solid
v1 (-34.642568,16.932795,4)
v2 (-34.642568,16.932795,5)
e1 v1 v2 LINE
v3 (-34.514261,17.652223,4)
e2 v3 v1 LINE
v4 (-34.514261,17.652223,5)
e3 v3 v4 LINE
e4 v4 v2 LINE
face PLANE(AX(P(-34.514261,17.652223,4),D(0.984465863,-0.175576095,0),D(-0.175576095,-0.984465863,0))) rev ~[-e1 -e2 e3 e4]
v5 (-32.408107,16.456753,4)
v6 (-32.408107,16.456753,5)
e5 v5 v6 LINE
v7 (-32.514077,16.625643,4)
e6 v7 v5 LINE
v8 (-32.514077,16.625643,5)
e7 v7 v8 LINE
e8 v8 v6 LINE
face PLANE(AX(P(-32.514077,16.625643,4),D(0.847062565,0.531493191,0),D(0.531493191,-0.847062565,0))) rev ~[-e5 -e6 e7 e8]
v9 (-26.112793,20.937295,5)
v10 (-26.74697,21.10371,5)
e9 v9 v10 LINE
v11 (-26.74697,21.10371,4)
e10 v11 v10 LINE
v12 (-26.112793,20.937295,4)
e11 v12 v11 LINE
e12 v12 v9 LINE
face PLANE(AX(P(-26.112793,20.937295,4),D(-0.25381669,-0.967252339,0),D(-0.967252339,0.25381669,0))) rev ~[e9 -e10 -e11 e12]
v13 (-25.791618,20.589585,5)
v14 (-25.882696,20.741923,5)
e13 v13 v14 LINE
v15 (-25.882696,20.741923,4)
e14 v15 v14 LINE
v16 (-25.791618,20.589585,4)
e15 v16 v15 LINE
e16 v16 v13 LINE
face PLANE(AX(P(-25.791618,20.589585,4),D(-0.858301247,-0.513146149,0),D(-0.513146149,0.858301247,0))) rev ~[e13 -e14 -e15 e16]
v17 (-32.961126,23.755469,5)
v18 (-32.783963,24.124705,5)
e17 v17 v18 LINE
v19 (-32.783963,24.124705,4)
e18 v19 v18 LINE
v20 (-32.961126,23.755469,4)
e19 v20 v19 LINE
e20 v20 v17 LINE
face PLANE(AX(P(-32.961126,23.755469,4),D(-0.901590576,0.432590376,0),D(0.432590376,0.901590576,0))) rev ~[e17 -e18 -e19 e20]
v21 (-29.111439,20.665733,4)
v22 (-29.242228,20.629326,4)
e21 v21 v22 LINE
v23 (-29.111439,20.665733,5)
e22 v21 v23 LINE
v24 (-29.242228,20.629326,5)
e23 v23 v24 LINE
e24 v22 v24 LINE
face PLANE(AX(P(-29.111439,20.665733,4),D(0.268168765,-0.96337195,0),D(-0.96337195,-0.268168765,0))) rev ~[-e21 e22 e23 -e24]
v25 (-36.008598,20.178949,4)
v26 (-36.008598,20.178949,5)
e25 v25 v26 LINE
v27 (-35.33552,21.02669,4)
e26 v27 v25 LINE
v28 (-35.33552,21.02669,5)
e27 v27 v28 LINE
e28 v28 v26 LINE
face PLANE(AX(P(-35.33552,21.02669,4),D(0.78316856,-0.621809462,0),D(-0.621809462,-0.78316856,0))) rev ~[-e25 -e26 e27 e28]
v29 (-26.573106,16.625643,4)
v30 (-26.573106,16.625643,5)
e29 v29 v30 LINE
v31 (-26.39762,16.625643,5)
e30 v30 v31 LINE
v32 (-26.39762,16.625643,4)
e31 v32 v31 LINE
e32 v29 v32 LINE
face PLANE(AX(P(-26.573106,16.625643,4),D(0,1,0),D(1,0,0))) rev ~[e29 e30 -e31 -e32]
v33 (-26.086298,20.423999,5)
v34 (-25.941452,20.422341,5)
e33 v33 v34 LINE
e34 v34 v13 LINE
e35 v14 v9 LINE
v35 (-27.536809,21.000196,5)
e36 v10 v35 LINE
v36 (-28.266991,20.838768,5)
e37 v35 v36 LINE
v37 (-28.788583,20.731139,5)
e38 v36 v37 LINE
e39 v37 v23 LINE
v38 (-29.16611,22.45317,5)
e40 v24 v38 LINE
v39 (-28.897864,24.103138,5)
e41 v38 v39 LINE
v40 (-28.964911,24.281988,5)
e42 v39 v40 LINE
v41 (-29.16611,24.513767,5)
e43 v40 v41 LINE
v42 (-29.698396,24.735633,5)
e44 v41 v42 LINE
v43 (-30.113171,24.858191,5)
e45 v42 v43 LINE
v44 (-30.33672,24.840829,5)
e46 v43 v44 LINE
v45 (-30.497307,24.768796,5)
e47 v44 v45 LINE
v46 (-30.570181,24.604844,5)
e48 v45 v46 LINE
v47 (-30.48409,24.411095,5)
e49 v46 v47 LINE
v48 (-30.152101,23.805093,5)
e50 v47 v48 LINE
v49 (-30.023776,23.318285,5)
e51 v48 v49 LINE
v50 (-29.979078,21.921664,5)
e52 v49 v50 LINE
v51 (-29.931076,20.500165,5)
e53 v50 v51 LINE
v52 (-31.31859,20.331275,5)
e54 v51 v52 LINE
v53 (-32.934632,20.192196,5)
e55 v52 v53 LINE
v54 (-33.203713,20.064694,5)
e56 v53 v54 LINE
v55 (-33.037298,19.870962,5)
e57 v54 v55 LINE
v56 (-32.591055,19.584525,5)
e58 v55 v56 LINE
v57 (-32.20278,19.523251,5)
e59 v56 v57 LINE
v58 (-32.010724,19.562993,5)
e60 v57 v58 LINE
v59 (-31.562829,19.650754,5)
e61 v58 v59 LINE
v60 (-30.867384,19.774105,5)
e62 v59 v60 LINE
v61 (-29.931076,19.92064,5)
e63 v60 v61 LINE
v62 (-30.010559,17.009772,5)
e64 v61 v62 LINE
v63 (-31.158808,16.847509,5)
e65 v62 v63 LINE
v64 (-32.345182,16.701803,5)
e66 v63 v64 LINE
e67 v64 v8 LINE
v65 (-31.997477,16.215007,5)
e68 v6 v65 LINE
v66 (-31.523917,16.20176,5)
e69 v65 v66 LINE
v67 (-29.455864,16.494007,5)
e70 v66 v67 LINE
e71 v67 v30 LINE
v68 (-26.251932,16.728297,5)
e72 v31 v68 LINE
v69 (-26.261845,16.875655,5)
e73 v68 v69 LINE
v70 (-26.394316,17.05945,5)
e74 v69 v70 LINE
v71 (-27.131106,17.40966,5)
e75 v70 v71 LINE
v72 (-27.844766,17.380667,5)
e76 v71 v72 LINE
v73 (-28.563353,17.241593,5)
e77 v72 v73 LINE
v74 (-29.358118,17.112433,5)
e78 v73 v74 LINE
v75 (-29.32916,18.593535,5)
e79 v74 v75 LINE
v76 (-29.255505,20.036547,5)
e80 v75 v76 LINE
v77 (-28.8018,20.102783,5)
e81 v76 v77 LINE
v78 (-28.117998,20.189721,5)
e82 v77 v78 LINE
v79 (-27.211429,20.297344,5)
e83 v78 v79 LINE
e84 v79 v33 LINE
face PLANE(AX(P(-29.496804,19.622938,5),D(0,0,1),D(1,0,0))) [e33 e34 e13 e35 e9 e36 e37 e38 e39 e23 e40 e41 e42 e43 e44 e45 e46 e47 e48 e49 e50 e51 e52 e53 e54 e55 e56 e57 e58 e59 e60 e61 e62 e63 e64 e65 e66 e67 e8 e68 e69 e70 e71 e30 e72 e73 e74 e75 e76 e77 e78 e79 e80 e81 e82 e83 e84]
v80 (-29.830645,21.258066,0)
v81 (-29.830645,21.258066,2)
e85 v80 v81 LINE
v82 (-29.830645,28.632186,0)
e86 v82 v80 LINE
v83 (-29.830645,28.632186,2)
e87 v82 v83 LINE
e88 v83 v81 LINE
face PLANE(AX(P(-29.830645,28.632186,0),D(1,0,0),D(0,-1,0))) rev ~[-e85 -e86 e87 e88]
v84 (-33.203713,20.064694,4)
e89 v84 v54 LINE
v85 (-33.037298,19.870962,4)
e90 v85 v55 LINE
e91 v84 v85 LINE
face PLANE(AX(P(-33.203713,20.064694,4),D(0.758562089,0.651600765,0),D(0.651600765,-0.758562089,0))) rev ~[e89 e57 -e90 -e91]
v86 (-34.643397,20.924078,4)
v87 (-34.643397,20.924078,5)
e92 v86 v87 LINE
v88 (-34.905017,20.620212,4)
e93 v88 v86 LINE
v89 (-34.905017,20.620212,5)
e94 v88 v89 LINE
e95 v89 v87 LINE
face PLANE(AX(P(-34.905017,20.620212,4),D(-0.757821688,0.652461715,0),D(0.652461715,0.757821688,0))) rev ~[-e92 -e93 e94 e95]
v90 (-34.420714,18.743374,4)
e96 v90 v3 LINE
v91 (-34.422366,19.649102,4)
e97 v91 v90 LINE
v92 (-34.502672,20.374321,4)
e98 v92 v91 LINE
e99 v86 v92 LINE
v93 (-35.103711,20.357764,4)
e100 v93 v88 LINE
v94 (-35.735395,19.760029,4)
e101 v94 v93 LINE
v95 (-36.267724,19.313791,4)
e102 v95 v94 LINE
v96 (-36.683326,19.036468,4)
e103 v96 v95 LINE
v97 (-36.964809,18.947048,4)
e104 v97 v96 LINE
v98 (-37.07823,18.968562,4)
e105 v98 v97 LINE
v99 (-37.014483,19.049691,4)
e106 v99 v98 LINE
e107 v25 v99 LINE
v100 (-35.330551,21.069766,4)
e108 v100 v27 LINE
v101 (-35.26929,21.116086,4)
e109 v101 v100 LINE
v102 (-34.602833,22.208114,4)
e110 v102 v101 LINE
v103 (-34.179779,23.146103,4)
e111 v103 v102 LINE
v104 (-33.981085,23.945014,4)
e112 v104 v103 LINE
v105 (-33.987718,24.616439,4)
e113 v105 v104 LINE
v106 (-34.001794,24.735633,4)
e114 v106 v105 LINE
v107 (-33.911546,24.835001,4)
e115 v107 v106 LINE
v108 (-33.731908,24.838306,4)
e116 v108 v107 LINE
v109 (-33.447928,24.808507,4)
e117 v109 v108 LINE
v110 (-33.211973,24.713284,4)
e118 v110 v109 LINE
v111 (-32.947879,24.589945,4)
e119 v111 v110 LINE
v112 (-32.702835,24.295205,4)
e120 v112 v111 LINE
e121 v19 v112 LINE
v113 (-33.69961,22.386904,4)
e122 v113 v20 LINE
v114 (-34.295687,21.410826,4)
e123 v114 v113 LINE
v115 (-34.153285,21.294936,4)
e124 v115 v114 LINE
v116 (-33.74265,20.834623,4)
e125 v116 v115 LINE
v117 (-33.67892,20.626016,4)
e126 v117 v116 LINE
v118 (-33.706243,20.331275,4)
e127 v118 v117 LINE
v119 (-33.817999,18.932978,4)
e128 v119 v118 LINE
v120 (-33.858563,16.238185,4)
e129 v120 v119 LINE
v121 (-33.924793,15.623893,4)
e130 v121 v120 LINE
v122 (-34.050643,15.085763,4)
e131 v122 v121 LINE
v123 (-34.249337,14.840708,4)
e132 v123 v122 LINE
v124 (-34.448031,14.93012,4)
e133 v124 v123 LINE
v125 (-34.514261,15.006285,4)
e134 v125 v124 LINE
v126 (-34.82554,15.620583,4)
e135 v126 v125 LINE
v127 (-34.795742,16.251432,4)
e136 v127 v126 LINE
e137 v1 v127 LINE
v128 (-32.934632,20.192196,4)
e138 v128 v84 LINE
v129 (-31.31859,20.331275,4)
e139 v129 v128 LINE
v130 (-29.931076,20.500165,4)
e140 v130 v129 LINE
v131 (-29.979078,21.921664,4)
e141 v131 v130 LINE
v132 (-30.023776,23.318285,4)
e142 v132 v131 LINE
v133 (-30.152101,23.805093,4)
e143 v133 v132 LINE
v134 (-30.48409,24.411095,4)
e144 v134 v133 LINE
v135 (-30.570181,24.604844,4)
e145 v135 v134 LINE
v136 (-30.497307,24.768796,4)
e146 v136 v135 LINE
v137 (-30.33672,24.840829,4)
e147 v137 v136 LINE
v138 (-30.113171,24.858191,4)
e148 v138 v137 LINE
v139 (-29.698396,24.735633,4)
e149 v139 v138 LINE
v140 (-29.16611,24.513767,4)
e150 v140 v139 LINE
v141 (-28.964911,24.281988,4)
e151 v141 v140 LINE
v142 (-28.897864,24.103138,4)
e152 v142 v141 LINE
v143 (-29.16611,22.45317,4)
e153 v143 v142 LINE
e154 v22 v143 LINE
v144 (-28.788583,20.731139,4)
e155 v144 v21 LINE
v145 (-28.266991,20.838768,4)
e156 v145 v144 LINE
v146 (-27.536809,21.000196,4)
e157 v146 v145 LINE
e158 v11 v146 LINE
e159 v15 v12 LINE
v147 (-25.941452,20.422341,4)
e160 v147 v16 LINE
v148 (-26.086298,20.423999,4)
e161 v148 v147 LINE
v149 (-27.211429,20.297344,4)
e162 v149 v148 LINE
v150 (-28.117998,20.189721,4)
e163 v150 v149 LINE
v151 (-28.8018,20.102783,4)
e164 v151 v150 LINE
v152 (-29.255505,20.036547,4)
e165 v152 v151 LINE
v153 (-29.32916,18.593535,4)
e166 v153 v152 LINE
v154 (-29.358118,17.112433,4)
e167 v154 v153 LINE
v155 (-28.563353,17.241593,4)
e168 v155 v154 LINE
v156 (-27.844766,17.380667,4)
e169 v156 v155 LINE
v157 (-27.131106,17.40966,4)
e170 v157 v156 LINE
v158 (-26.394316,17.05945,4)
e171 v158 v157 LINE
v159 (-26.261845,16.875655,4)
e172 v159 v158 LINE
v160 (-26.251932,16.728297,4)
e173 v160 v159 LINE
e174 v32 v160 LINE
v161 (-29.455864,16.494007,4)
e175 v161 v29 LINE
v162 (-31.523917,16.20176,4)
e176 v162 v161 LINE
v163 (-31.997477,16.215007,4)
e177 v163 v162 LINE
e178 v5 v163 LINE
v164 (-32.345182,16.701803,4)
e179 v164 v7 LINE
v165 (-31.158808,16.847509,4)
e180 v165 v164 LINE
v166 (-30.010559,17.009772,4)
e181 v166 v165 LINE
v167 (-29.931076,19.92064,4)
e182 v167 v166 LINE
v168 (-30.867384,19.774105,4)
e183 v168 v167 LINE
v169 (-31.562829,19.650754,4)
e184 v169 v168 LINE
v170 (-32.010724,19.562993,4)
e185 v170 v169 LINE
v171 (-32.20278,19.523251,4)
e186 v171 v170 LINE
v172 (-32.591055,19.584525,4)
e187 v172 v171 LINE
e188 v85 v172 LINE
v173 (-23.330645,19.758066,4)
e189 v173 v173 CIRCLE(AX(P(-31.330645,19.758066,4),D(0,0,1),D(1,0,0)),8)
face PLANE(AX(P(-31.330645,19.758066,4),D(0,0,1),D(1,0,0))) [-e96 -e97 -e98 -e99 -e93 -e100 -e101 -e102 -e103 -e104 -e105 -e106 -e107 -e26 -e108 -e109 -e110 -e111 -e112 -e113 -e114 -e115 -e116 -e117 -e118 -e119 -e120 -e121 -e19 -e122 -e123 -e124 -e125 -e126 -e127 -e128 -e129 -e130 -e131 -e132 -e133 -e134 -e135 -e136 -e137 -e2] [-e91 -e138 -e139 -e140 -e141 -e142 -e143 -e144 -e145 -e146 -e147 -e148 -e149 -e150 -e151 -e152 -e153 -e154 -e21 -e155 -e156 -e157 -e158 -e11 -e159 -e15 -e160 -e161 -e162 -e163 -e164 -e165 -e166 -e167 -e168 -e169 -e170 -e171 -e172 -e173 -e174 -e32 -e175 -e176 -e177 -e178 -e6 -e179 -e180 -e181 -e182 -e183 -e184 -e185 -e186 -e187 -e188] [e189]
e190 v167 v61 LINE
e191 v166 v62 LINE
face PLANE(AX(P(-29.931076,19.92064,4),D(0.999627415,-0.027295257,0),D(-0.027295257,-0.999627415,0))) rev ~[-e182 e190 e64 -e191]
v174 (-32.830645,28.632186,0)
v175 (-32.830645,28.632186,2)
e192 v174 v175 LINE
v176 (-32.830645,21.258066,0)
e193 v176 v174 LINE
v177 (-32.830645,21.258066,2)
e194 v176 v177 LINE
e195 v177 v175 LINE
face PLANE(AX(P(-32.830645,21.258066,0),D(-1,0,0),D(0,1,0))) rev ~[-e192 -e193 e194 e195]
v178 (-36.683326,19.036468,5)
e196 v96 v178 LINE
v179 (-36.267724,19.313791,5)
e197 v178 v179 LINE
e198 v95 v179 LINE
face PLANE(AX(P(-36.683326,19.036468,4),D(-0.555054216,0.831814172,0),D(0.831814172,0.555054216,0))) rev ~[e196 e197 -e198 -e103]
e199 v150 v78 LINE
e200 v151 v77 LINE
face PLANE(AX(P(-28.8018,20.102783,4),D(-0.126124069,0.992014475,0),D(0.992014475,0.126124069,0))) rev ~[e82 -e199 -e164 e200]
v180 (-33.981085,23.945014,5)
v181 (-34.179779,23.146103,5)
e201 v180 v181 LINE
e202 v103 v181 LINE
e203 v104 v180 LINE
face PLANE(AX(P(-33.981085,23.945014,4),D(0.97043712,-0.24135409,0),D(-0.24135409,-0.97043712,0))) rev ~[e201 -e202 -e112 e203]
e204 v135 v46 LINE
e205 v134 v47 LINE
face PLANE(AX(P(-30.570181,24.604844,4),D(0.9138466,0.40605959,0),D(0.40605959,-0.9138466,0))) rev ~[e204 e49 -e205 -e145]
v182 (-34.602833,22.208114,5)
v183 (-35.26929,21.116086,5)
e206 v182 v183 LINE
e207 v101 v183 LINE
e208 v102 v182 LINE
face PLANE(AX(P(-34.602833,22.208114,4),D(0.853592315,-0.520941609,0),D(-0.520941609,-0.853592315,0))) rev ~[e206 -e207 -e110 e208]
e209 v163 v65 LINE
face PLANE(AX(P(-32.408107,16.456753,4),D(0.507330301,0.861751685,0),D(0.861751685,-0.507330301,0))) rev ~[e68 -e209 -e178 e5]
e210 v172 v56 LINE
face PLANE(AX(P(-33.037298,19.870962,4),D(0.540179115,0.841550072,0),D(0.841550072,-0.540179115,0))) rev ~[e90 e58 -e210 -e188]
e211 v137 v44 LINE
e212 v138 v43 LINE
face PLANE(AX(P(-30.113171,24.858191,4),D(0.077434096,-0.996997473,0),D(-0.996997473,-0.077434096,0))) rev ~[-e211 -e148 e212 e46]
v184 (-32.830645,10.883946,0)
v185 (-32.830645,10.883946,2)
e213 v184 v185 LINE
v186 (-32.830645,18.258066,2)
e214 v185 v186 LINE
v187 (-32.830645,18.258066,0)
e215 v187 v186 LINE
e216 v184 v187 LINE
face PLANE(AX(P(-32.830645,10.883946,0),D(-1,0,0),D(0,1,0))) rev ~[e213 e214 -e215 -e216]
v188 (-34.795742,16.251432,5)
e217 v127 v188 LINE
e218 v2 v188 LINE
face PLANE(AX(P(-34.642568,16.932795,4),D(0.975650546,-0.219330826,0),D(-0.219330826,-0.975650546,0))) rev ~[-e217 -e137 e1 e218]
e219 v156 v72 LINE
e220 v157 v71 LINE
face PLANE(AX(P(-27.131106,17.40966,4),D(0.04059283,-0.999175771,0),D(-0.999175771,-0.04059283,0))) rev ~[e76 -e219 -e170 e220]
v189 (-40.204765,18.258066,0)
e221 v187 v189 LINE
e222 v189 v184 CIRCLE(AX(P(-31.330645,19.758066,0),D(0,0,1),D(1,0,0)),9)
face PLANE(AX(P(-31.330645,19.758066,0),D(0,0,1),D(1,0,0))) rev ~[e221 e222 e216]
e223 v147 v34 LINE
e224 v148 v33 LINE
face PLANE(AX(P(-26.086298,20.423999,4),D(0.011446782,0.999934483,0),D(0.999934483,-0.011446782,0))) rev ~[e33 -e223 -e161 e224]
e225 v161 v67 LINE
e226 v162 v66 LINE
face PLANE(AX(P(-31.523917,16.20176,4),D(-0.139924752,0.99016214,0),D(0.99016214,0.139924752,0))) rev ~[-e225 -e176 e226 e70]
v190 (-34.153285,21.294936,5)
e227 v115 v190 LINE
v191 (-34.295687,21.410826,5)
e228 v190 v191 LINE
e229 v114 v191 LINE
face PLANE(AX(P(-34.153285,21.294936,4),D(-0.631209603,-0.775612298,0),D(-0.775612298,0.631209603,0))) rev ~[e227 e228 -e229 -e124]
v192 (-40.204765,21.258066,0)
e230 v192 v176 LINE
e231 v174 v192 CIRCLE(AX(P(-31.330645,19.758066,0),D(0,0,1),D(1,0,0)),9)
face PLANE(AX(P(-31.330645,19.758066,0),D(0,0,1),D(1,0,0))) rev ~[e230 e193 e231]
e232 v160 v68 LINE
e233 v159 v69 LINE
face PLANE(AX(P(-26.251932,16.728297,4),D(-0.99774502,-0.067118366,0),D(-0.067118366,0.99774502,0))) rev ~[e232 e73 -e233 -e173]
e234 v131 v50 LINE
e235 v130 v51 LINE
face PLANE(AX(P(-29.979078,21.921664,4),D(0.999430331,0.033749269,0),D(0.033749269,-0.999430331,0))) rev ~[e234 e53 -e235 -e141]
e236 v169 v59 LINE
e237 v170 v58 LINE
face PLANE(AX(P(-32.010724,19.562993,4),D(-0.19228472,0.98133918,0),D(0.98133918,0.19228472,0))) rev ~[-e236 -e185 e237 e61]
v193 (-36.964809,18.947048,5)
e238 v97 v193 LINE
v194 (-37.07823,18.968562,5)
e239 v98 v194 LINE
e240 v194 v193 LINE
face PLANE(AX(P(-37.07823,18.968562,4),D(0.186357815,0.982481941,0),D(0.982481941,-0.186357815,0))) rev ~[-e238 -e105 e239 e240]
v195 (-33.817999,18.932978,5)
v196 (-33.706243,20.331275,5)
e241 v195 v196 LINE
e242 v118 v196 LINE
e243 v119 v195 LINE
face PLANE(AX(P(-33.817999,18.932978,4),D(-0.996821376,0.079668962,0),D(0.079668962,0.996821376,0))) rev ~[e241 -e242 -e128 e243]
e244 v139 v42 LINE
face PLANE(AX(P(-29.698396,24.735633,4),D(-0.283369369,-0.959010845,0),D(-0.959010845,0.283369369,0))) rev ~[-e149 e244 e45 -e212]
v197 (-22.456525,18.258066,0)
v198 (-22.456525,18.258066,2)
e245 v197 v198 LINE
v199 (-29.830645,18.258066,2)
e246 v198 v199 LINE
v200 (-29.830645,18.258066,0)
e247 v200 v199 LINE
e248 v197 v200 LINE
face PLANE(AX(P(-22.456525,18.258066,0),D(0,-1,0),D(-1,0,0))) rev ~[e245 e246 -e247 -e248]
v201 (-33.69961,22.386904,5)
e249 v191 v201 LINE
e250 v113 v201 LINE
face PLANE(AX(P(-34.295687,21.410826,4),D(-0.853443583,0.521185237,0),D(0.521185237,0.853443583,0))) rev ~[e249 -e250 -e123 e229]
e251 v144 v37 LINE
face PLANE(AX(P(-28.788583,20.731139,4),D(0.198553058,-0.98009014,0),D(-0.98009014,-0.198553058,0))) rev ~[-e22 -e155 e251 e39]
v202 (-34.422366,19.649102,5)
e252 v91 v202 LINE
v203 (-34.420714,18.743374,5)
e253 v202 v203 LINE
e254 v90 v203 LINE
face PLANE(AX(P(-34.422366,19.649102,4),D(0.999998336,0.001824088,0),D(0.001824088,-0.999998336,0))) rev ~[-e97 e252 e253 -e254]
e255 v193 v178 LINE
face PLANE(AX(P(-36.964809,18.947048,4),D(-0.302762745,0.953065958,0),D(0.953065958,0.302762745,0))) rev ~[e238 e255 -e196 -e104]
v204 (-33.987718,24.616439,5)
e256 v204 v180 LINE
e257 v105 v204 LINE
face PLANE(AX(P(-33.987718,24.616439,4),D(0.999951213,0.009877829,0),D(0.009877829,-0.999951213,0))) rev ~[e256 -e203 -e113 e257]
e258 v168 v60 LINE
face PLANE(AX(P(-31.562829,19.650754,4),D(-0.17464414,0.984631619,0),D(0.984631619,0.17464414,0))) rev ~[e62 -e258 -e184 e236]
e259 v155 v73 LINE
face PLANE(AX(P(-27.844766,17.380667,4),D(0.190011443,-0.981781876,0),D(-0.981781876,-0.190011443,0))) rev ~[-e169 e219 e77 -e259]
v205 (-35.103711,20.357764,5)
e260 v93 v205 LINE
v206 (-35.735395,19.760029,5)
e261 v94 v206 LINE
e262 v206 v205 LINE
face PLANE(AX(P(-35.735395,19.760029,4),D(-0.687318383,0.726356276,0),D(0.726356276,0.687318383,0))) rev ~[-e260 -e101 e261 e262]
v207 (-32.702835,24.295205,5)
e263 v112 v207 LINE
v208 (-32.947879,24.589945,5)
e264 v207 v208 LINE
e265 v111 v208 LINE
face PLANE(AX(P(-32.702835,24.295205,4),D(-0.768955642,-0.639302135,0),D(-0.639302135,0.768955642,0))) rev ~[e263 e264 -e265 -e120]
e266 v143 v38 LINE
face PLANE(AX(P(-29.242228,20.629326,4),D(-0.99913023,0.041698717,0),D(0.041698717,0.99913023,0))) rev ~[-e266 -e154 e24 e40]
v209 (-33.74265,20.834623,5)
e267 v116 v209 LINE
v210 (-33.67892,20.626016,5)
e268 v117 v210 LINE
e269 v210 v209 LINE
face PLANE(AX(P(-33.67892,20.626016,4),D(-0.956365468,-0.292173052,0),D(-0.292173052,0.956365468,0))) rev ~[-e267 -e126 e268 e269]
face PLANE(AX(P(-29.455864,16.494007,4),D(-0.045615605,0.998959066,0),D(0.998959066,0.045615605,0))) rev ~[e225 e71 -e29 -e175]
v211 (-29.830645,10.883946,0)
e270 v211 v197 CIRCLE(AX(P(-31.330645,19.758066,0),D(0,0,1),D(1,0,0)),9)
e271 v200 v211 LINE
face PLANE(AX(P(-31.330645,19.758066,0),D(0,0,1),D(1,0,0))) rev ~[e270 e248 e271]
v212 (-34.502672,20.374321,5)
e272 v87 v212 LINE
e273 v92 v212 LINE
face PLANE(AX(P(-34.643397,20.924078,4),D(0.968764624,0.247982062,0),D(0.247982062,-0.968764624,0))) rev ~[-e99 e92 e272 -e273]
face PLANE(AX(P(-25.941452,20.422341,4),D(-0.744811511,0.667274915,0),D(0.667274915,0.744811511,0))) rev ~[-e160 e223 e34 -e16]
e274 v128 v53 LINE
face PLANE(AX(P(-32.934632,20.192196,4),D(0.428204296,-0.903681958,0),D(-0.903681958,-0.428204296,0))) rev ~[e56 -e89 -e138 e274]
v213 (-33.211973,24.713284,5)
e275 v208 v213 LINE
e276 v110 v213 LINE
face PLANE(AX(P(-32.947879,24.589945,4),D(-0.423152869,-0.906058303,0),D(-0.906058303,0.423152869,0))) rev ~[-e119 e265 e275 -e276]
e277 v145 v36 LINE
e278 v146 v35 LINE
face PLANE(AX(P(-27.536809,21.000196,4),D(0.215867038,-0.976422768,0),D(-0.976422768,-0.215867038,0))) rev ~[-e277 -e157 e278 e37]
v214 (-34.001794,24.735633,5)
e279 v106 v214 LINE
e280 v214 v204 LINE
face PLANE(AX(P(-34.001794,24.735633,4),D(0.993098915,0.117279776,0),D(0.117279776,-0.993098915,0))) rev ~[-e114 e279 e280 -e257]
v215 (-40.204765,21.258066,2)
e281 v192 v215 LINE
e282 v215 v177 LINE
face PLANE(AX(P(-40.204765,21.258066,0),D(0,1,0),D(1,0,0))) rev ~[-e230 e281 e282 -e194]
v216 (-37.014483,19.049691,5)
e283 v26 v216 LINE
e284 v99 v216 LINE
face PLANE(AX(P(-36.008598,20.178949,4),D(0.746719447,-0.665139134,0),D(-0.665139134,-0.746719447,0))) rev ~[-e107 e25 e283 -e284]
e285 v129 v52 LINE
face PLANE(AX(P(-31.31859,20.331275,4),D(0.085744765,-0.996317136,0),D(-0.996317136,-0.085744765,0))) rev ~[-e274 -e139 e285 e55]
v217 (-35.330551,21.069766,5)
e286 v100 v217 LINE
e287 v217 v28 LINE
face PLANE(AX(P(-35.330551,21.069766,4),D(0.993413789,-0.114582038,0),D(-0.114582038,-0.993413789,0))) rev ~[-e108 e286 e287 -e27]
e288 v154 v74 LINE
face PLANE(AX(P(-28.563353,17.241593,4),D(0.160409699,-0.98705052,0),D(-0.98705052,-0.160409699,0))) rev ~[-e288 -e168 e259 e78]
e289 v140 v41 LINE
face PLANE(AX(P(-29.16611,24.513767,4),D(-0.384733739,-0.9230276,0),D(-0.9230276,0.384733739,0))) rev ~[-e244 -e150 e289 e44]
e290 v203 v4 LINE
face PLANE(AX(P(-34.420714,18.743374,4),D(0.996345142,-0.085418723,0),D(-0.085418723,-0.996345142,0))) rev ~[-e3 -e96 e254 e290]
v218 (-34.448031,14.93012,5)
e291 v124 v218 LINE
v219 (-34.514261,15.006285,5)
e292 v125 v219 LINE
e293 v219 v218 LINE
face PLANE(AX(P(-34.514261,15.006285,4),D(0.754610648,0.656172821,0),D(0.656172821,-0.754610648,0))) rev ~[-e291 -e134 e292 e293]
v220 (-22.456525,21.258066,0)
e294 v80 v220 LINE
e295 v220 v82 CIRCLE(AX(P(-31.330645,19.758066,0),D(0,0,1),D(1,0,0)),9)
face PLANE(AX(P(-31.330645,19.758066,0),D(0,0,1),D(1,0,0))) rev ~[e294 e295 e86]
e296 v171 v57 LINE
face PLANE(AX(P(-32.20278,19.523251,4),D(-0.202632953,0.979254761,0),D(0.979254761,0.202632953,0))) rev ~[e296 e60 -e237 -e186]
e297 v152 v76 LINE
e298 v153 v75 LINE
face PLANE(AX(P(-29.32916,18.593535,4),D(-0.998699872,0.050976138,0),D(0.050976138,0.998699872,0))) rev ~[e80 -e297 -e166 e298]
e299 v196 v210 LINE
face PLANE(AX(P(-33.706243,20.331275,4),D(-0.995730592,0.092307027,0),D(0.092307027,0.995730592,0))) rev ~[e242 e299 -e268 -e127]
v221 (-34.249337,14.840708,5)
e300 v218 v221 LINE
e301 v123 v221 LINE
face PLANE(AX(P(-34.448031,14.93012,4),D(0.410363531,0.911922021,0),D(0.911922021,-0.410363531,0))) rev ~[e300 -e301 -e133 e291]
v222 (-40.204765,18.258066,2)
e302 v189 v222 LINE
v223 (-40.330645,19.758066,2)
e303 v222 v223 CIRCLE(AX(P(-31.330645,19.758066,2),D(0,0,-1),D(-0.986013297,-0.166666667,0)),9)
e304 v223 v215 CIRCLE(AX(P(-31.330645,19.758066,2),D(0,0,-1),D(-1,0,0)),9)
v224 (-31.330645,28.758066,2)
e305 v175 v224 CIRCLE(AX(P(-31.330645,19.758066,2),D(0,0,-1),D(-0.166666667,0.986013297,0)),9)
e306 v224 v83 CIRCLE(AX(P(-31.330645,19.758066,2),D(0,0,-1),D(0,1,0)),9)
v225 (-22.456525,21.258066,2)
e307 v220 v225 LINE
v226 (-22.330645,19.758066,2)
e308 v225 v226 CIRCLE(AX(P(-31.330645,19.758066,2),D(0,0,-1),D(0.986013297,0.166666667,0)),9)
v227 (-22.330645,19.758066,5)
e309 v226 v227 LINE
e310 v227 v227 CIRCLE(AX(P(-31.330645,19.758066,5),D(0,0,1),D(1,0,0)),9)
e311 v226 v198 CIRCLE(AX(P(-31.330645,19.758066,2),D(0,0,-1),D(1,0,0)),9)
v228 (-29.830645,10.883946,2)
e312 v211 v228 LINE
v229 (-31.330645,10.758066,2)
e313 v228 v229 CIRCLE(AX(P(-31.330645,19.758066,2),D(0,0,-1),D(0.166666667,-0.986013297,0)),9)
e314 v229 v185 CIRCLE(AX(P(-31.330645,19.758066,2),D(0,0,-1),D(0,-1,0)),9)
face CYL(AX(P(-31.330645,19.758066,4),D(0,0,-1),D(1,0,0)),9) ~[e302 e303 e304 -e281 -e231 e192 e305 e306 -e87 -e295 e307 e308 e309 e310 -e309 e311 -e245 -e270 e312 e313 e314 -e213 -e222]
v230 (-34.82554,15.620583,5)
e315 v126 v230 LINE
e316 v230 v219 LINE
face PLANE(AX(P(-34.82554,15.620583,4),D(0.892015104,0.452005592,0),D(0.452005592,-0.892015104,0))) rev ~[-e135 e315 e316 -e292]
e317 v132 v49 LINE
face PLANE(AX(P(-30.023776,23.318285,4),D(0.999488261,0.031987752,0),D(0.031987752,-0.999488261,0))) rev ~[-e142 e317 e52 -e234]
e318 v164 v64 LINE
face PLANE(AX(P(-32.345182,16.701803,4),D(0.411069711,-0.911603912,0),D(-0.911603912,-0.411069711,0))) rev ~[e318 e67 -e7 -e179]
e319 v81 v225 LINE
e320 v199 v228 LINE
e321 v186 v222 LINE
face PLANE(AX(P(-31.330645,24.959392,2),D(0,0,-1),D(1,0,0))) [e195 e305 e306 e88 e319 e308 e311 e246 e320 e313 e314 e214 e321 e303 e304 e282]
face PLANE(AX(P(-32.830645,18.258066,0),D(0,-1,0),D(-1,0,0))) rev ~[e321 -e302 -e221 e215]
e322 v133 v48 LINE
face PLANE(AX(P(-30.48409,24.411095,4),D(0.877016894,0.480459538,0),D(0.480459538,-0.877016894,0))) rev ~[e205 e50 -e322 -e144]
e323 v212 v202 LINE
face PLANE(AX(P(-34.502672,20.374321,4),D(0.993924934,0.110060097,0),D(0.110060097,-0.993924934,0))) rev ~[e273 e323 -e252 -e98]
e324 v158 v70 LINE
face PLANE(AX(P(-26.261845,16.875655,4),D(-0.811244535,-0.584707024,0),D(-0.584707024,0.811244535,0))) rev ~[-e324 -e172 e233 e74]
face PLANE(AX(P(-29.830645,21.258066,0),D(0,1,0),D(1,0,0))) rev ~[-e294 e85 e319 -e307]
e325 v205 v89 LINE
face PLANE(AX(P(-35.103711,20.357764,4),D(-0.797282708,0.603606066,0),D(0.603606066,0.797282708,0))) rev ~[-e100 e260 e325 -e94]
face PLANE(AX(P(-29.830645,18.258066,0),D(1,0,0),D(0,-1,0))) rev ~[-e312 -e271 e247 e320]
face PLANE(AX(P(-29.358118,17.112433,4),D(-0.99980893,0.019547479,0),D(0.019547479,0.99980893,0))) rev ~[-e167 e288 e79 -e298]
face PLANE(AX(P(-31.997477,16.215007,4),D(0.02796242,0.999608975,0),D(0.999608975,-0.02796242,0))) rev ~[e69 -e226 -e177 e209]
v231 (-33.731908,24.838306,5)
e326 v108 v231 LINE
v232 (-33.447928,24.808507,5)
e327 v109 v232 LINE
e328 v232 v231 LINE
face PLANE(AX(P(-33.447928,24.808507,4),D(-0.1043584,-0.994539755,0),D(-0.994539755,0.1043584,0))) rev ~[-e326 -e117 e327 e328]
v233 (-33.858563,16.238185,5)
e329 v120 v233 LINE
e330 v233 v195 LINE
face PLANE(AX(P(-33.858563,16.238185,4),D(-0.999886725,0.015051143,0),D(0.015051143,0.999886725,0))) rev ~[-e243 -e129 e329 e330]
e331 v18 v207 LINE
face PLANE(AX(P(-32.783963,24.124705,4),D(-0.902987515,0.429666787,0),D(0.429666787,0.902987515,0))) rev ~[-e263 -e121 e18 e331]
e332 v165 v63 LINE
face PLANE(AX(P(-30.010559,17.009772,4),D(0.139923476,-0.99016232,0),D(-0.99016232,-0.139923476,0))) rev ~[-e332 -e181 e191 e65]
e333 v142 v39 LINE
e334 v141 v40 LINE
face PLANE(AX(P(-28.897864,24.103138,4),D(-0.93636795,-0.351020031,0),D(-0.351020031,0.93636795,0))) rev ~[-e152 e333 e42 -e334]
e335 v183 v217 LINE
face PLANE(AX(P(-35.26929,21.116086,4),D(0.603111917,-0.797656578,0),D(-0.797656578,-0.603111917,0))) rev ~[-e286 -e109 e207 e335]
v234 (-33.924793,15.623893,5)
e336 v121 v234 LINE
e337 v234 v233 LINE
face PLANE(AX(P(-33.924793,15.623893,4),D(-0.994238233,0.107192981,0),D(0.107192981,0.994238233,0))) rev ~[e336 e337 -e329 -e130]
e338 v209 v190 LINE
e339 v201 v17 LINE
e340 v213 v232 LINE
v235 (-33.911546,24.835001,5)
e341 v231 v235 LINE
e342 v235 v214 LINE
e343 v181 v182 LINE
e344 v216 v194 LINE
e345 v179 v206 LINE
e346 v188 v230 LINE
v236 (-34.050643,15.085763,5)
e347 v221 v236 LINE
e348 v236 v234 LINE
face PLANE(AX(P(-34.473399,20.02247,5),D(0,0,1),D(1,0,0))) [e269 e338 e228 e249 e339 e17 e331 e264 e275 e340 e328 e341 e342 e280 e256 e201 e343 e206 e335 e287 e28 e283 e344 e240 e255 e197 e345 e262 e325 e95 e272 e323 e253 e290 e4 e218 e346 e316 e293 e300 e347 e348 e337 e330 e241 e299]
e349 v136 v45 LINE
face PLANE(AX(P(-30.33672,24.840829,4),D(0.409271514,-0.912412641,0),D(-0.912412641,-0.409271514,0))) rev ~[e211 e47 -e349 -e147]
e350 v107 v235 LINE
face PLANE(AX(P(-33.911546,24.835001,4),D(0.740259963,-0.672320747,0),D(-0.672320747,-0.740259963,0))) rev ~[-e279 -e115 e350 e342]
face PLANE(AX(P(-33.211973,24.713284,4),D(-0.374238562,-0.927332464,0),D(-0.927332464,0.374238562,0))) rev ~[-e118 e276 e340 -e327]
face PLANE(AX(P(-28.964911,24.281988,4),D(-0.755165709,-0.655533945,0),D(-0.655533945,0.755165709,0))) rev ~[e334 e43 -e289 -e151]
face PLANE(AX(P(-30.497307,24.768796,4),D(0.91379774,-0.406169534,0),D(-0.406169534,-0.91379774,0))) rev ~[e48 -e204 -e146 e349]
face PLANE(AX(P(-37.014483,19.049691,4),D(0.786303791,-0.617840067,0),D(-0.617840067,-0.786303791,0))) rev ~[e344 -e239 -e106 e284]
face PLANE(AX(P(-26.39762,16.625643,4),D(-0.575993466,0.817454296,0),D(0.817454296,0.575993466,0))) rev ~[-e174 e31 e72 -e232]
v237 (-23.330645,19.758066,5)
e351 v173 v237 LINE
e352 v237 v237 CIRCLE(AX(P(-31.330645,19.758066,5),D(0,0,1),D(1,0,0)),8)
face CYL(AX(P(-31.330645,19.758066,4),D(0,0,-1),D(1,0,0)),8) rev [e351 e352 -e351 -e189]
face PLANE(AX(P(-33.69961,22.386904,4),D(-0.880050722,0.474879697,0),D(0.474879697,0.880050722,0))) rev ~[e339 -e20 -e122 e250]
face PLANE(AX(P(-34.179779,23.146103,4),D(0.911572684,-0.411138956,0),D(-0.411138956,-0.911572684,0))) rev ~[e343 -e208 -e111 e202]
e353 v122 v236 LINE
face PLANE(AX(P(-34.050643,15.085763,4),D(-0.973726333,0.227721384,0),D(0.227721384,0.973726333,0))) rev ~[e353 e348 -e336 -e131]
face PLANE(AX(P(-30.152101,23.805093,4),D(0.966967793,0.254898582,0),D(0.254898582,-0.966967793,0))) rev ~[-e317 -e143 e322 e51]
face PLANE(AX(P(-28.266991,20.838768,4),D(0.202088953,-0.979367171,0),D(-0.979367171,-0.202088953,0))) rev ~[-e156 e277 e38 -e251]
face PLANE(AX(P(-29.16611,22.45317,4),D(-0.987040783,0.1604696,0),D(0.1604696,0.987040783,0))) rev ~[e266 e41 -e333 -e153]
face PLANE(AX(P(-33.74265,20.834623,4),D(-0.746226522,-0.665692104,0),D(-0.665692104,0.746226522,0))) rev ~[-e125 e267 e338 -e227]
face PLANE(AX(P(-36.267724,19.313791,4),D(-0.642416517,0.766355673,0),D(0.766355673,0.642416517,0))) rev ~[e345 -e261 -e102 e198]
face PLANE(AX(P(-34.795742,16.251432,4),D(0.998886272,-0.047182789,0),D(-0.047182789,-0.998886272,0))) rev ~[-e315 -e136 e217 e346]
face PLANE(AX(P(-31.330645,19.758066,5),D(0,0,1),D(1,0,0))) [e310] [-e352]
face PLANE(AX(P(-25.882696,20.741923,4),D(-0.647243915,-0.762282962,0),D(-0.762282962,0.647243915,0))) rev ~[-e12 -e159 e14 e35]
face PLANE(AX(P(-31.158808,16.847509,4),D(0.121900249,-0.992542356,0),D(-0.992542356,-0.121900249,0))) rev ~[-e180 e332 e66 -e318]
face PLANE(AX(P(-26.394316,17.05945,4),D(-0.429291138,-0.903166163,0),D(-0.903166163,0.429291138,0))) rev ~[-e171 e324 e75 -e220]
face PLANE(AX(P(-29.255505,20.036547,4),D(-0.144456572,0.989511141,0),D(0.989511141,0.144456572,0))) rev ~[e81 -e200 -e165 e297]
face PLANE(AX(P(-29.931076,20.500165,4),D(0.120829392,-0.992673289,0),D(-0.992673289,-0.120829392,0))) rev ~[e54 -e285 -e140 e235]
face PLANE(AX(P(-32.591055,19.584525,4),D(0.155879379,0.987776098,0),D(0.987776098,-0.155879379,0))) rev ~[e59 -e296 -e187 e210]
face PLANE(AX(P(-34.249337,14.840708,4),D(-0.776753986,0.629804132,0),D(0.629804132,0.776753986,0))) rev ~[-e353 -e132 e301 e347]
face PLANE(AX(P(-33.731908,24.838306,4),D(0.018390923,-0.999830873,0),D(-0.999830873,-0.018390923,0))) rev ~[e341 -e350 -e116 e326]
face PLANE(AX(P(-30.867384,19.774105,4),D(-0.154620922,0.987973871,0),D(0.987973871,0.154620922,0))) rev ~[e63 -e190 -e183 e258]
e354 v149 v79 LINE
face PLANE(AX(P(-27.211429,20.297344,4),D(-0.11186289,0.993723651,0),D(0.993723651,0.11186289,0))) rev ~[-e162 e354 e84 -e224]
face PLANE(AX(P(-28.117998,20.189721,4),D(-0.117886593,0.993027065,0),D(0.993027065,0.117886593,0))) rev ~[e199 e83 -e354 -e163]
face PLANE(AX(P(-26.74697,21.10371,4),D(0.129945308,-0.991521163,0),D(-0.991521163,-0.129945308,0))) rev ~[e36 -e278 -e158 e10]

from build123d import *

# Parameters (mm, degrees)
F0_R     = 9
F1_DEPTH = 4
F3_W     = 3
F3_H     = 3
F4_DEPTH = 2
F2_R     = 9
F2_R_2   = 8
F5_DEPTH = 1
F7_DEPTH = 1


# Not quite as in the source:
# - a feature names something its author has since deleted; it is built from what else it names


with BuildPart() as f1:
    # F0 (on Top) → F1 (new body)
    with BuildSketch(Plane.XY):
        with Locations((-31.3306450844, 19.7580661625)):
            Circle(F0_R)
    extrude(amount=F1_DEPTH)

    # F3 (on face) → F4 (cut)
    with BuildSketch(Plane(origin=(0, 0, 0), x_dir=(1, 0, 0), z_dir=(0, 0, -1))):
        with BuildLine():
            ThreePointArc((-32.8306450844, -28.6321858371), (-32.0832814269, -28.7265408676), (-31.3306450844, -28.7580661625))
            ThreePointArc((-31.3306450844, -28.7580661625), (-30.5780087419, -28.7265408676), (-29.8306450844, -28.6321858371))
            Line((-29.8306450844, -28.6321858371), (-29.8306450844, -21.2580661625))
            Line((-29.8306450844, -21.2580661625), (-32.8306450844, -21.2580661625))
            Line((-32.8306450844, -21.2580661625), (-32.8306450844, -28.6321858371))
        make_face()
        with BuildLine():
            ThreePointArc((-40.204764759, -18.2580661625), (-40.2991197895, -19.0054298199), (-40.3306450844, -19.7580661625))
            ThreePointArc((-40.3306450844, -19.7580661625), (-40.2991197895, -20.510702505), (-40.204764759, -21.2580661625))
            Line((-40.204764759, -21.2580661625), (-32.8306450844, -21.2580661625))
            Line((-32.8306450844, -21.2580661625), (-32.8306450844, -18.2580661625))
            Line((-32.8306450844, -18.2580661625), (-40.204764759, -18.2580661625))
        make_face()
        with Locations((-31.3306450844, -19.7580661625)):
            Rectangle(F3_W, F3_H)
        with BuildLine():
            Line((-29.8306450844, -18.2580661625), (-29.8306450844, -21.2580661625))
            Line((-29.8306450844, -21.2580661625), (-22.4565254097, -21.2580661625))
            ThreePointArc((-22.4565254097, -21.2580661625), (-22.3621703793, -20.510702505), (-22.3306450844, -19.7580661625))
            ThreePointArc((-22.3306450844, -19.7580661625), (-22.3621703793, -19.0054298199), (-22.4565254097, -18.2580661625))
            Line((-22.4565254097, -18.2580661625), (-29.8306450844, -18.2580661625))
        make_face()
        with BuildLine():
            Line((-32.8306450844, -10.8839464878), (-32.8306450844, -18.2580661625))
            Line((-32.8306450844, -18.2580661625), (-29.8306450844, -18.2580661625))
            Line((-29.8306450844, -18.2580661625), (-29.8306450844, -10.8839464878))
            ThreePointArc((-29.8306450844, -10.8839464878), (-30.5780087419, -10.7895914574), (-31.3306450844, -10.7580661625))
            ThreePointArc((-31.3306450844, -10.7580661625), (-32.0832814269, -10.7895914574), (-32.8306450844, -10.8839464878))
        make_face()
    extrude(amount=-F4_DEPTH, mode=Mode.SUBTRACT)

    # F2 (on face) → F5 (join)
    with BuildSketch(Plane.XY.offset(4)):
        with Locations((-31.3306450844, 19.7580661625)):
            Circle(F2_R)
        with Locations((-31.3306450844, 19.7580661625)):
            Circle(F2_R_2, mode=Mode.SUBTRACT)
    extrude(amount=F5_DEPTH)

    # F6 (on face) → F7 (join)
    with BuildSketch(Plane.XY.offset(4)):
        Polygon((-34.9050166448, 20.6202120843), (-34.6433972716, 20.9240779367), (-34.5026717981, 20.3743209936), (-34.4223662395, 19.6491017819), (-34.4207141089, 18.7433737938), (-34.5142607427, 17.652222692), (-34.6425682025, 16.9327949487), (-34.7957417285, 16.2514322926), (-34.8255401553, 15.620582776), (-34.5142607427, 15.0062852041), (-34.4480313361, 14.930120185), (-34.2493371085, 14.8407080829), (-34.0506428809, 15.0857628952), (-33.9247925897, 15.6238930448), (-33.8585631831, 16.2381852097), (-33.8179988731, 18.9329782997), (-33.7062427572, 20.331275484), (-33.6789195223, 20.6260155682), (-33.7426497061, 20.8346225789), (-34.1532852441, 21.2949361796), (-34.2956868792, 21.4108256257), (-33.6996102042, 22.3869043351), (-32.9611258864, 23.7554691778), (-32.7839634252, 24.124705329), (-32.7028348052, 24.2952051983), (-32.9478788035, 24.5899452825), (-33.2119733685, 24.7132843353), (-33.4479276451, 24.8085071305), (-33.7319078538, 24.8383055573), (-33.9115455069, 24.8350012963), (-34.0017938873, 24.7356331554), (-33.9877177353, 24.6164394483), (-33.9810851823, 23.9450136062), (-34.1797794099, 23.1461033657), (-34.6028329616, 22.2081137744), (-35.2692903966, 21.1160855415), (-35.3305513962, 21.0697658095), (-35.3355198033, 21.0266902611), (-36.0085977758, 20.1789490503), (-37.0144827221, 19.0496908072), (-37.0782297275, 18.9685621872), (-36.9648088648, 18.947048444), (-36.6833260766, 19.0364677553), (-36.2677239339, 19.31379138), (-35.7353954658, 19.7600288287), (-35.1037108724, 20.357763642), align=None)
        Polygon((-29.9310764641, 19.9206399459), (-30.0105589614, 17.0097722153), (-31.1588076939, 16.8475089676), (-32.3451815909, 16.7018030715), (-32.5140773917, 16.6256428585), (-32.4081067365, 16.4567530655), (-31.9974772062, 16.2150073205), (-31.5239165226, 16.2017602376), (-29.45586365, 16.4940071067), (-26.5731061692, 16.6256428585), (-26.3976198696, 16.6256428585), (-26.2519319967, 16.7282972372), (-26.2618447798, 16.8756552638), (-26.3943156085, 17.059450278), (-27.1311057416, 17.4096598934), (-27.8447660474, 17.3806665048), (-28.563352706, 17.2415931617), (-29.3581176009, 17.1124326018), (-29.3291602587, 18.5935345676), (-29.2555052764, 20.0365474153), (-28.8018001977, 20.1027828296), (-28.1179983962, 20.1897209413), (-27.2114293234, 20.297343727), (-26.0862984027, 20.4239990563), (-25.9414516145, 20.4223409181), (-25.791618396, 20.5895845884), (-25.8826958455, 20.7419230375), (-26.1127925684, 20.9372949808), (-26.746970377, 21.103709582), (-27.5368089191, 21.0001960954), (-28.2669905301, 20.8387679245), (-28.7885831536, 20.731139131), (-29.1114394953, 20.6657327858), (-29.2422281548, 20.629325837), (-29.1661099961, 22.4531697882), (-28.8978640776, 24.103137516), (-28.9649105379, 24.2819881542), (-29.1661099961, 24.5137670463), (-29.6983964099, 24.7356331554), (-30.1131712858, 24.858191201), (-30.3367195641, 24.8408288112), (-30.4973066504, 24.7687959206), (-30.5701806256, 24.6048444959), (-30.4840896063, 24.4110946444), (-30.1521014886, 23.8050931708), (-30.0237760055, 23.3182854043), (-29.9790783653, 21.9216643815), (-29.9310764641, 20.500165277), (-31.318589742, 20.331275484), (-32.9346317206, 20.1921961332), (-33.203712716, 20.0646937115), (-33.0372981148, 19.8709618832), (-32.5910546583, 19.5845245058), (-32.2027799559, 19.5232514908), (-32.0107242891, 19.5629927394), (-31.5628287021, 19.6507539124), (-30.8673838862, 19.7741049807), align=None)
    extrude(amount=F7_DEPTH)


solid = f1.part
